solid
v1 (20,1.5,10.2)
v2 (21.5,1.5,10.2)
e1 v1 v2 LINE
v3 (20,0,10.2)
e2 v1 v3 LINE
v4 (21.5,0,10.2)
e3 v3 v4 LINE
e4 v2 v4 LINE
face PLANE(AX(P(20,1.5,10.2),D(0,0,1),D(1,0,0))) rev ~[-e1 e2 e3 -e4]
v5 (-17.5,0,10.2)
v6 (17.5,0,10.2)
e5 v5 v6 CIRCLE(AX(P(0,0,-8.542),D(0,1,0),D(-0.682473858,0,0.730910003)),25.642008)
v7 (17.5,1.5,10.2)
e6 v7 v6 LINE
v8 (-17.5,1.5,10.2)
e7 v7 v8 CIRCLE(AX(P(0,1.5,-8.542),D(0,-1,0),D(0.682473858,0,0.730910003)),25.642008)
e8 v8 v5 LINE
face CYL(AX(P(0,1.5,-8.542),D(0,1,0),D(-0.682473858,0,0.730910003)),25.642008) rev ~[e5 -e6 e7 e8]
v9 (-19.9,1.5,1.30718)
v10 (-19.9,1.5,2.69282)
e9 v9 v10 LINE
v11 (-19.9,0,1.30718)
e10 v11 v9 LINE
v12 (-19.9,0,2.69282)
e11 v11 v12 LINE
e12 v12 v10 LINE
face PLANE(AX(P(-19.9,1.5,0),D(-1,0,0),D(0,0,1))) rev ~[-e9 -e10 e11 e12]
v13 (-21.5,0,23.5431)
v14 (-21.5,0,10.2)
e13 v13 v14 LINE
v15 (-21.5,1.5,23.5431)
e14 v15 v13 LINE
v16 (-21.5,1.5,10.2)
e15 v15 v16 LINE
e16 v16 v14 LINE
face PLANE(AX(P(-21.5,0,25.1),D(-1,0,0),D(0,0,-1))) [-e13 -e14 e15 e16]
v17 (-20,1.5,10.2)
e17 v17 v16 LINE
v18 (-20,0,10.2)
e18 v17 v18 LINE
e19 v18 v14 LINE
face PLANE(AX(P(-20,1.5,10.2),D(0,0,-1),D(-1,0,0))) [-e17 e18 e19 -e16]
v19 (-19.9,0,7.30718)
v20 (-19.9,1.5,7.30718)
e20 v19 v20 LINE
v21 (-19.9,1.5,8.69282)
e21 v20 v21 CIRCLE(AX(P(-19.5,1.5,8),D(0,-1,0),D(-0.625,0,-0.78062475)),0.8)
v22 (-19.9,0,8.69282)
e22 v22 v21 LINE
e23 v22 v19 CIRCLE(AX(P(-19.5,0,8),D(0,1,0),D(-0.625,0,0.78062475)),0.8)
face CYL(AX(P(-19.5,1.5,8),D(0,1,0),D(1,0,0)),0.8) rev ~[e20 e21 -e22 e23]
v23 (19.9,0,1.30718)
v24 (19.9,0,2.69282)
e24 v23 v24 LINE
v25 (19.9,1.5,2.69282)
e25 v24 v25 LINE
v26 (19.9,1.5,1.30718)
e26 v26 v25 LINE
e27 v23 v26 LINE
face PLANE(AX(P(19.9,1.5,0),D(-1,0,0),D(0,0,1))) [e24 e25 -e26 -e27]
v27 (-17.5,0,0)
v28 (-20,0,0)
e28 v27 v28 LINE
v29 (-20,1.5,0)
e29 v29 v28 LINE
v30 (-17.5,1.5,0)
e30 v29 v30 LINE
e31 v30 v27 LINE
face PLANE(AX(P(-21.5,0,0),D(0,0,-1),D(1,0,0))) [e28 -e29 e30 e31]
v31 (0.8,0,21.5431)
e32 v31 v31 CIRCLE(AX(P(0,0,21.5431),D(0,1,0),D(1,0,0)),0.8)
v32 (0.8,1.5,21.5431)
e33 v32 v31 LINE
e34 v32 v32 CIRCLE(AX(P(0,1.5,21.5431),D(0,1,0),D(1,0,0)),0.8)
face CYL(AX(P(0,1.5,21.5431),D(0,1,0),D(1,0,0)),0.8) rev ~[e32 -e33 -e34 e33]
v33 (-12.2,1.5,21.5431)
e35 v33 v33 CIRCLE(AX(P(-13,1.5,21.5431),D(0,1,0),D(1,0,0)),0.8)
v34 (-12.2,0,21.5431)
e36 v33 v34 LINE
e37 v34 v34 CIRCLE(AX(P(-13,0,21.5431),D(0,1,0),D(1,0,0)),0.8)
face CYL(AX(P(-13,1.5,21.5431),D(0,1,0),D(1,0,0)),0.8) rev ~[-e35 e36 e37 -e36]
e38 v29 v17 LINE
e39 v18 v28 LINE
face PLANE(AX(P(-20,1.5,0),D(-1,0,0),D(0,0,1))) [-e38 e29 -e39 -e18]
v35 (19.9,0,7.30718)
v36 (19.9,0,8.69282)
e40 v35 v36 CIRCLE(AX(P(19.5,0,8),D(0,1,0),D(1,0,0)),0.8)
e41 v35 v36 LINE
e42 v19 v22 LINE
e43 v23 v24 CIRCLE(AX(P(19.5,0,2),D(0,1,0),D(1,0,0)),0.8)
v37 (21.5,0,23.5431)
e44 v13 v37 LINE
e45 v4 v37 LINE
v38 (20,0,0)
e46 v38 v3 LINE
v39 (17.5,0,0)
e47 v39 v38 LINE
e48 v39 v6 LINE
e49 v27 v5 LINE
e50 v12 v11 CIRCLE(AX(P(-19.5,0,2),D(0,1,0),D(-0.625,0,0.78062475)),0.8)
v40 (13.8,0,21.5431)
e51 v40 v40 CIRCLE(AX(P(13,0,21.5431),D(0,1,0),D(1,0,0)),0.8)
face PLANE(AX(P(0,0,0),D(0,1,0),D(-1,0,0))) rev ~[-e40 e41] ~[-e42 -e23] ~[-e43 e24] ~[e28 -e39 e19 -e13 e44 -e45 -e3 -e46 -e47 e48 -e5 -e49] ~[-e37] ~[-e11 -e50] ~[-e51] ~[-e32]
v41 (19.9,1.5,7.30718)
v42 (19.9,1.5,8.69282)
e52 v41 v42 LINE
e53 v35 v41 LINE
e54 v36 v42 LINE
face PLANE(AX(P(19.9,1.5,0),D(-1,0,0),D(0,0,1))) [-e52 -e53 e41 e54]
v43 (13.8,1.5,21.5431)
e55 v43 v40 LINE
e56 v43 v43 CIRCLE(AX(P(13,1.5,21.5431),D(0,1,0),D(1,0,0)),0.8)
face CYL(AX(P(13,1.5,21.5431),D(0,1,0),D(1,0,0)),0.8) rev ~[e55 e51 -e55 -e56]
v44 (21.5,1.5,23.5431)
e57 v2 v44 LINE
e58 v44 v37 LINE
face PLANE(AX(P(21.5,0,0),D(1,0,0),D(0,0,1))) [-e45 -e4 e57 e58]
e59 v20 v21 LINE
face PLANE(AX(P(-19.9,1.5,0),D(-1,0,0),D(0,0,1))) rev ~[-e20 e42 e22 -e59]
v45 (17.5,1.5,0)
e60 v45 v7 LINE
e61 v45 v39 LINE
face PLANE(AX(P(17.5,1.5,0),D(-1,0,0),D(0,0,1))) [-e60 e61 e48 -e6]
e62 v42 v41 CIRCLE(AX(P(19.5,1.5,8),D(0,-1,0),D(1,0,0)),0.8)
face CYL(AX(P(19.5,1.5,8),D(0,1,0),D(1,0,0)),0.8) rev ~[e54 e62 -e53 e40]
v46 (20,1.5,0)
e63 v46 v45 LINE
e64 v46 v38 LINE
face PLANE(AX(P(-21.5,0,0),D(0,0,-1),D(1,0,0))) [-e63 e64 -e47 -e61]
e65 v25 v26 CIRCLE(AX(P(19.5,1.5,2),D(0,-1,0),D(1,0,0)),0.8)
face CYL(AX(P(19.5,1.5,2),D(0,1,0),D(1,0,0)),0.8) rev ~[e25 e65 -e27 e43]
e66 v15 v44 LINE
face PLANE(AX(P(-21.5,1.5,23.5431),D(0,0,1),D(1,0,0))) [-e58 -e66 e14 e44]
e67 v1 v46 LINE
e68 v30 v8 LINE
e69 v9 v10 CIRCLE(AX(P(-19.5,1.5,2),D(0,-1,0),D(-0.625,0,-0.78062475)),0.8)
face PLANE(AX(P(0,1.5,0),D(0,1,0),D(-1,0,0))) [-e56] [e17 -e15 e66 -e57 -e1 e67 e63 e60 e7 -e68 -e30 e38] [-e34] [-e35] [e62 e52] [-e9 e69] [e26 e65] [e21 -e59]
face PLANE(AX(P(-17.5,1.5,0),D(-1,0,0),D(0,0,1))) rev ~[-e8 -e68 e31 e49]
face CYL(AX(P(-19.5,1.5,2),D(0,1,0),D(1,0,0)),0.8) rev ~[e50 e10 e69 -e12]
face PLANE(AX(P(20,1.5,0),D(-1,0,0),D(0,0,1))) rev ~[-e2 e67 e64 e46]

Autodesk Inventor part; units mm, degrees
ref_plane "YZ Plane" through (0, 0, 0) normal (1, 0, 0) x (0, 1, 0)
ref_plane "XZ Plane" through (0, 0, 0) normal (0, 1, 0) x (-1, 0, 0)
ref_plane "XY Plane" through (0, 0, 0) normal (0, 0, 1) x (1, 0, 0)
sketch "スケッチ7" plane through (0, 1.5, 0) normal (0, 1, 0) x (1, 0, 0)
  line L0 (-20, 0) -> (-19.9, 0)
  line L1 (-19.9, 0) -> (-19.9, -10.2)
  line L2 (-19.9, -10.2) -> (-20, -10.2)
  line L3 (-20, -10.2) -> (-20, 0)
  line L4 (17.5, 0) -> (20, 0)
  line L5 (20, 0) -> (19.9, 0)
  line L6 (19.9, 0) -> (19.9, -10.2)
  line L7 (19.9, -10.2) -> (20, -10.2)
  line L8 (20, -10.2) -> (20, 0)
  line L9 (-20, -10.2) -> (-21.5, -10.2)
  line L10 (-20, 0) -> (-20, -1.3755)
  point P0 (0, 0)
  dimension "d21" = 0.1
  dimension "d22" = 0.1
sketch "スケッチ1" plane through (0, 0, 0) normal (0, 1, 0) x (-1, 0, 0)
  line L0 (21.5, 0) -> (-21.5, 0)
  line L1 (-21.5, 0) -> (-21.5, 25.1)
  line L2 (-21.5, 25.1) -> (21.5, 25.1)
  line L3 (21.5, 25.1) -> (21.5, 0)
  point P0 (0, 0)
  point P1 (0, 0)
  dimension "d0" = 25.1
  dimension "d1" = 43
extrude "プレート1" add sketch "スケッチ1" along normal blind 1.5
sketch "スケッチ3" plane through (0, 1.5, 0) normal (0, 1, 0) x (1, 0, 0)
  line L0 (21.5, 0) -> (-21.5, 0) projected
  line L1 (-20, 0) -> (-20, -17.1)
  line L2 (20, 0) -> (20, -17.1)
  line L3 (-21.5, -25.1) -> (-21.5, 0) projected
  line L4 (21.5, 0) -> (21.5, -25.1) projected
  line L5 (-20, -17.1) -> (20, -17.1)
  line L6 (-20, 0) -> (-17.5, 0)
  line L7 (-17.5, 0) -> (-17.5, -10.2)
  line L8 (-17.5, -10.2) -> (-20, -10.2)
  line L9 (-20, -10.2) -> (-20, 0)
  line L10 (20, 0) -> (17.5, 0)
  line L11 (17.5, 0) -> (17.5, -10.2)
  line L12 (17.5, -10.2) -> (20, -10.2)
  line L13 (20, -10.2) -> (20, 0)
  line L14 (-20, -10.2) -> (-21.5, -10.2)
  line L15 (20, -10.2) -> (21.5, -10.2)
  line L16 (21.5, -25.1) -> (-21.5, -25.1) projected
  arc A0 (-17.5, -10.2) -> (17.5, -10.2) centre (0, 8.542) ccw
  point P0 (0, 0)
  point P1 (20, -10.2)
  point P2 (17.5, 0)
  point P3 (-17.5, 0)
  dimension "d5" = 1.5
  dimension "d6" = 1.5
  dimension "d7" = 2.5
  dimension "d8" = 10.2
  dimension "d9" = 8
extrude "押し出し2" cut sketch "スケッチ3" against normal through all contours L4 L15 L2 L0 | L11 A0 L7 L0 | L1 L14 L3 L0
sketch "スケッチ4" plane through (-21.5, 0, 25.1) normal (-1, 0, 0) x (0, 0, 1)
  line L0 (-0.5569, 2.6) -> (-0.5569, 0)
  line L1 (0, 0) -> (-14.9, 0) projected
  line L2 (-14.9, 1.5) -> (-14.9, 0) projected
  line L3 (-14.9, 0) -> (0, 0) projected
  line L4 (0, 0) -> (0, 1.5) projected
  line L5 (0, 1.5) -> (-14.9, 1.5) projected
  point P0 (-25.1, 0)
  point P1 (0, 0)
  point P2 (-0.5569, 1.5)
extrude "押し出し3" cut sketch "スケッチ4" against normal through all contours L5 L4 L1 L0
sketch "スケッチ5" plane through (0, 1.5, 0) normal (0, 1, 0) x (1, 0, 0)
  circle A0 centre (0, -21.5431) radius 0.8 projected
  circle A1 centre (-13, -21.5431) radius 0.8 projected
  circle A2 centre (13, -21.5431) radius 0.8 projected
  line L0 (-21.5, -24.5431) -> (-21.5, -10.2) projected
  line L1 (-21.5, -23.5431) -> (21.5, -23.5431)
  line L2 (21.5, -24.5431) -> (-21.5, -24.5431) projected
  line L3 (21.5, -10.2) -> (21.5, -24.5431) projected
  point P0 (0, 0)
  dimension "d16" = 1
extrude "切り取り1" cut sketch "スケッチ5" against normal blind 1.5
sketch "スケッチ6" plane through (0, 1.5, 0) normal (0, 1, 0) x (1, 0, 0)
  circle A0 centre (19.5, -2) radius 0.8 projected
  circle A1 centre (19.5, -8) radius 0.8 projected
  line L0 (0, -21.3988) -> (0, 0)
  circle A2 centre (-19.5, -2) radius 0.8
  circle A3 centre (-19.5, -8) radius 0.8
  line L1 (-20, 0) -> (-17.5, 0) projected
  line L2 (-20, 0) -> (-19.9, 0)
  line L3 (-19.9, 0) -> (-19.9, -10.2)
  line L4 (-19.9, -10.2) -> (-20, -10.2)
  line L5 (-20, -10.2) -> (-20, 0)
  line L6 (-20, -10.2) -> (-21.5, -10.2) projected
  line L7 (20, 0) -> (19.9, 0)
  line L8 (19.9, 0) -> (19.9, -10.2)
  line L9 (19.9, -10.2) -> (20, -10.2)
  line L10 (20, -10.2) -> (20, 0)
  line L11 (17.5, 0) -> (20, 0) projected
  line L12 (21.5, -10.2) -> (20, -10.2) projected
  line L13 (20, -10.2) -> (20, 0) projected
  dimension "d19" = 0.1
  dimension "d20" = 0.1
extrude "切り取り2" cut sketch "スケッチ6" against normal blind 1.5 contours A0 L10 | L10 A0 L8 | L8 A0 | L10 A1 L8 | A1 L10 | L8 A1 | A2 L3 | L3 A2 L5 | L5 A2 | L3 A3 L5 | A3 L3 | L5 A3
sheet face with bend "面2" sketch "スケッチ7" thickness 1.5 toward (0, -1, 0) bend radius 1.5
bend "曲げ1"
equation "\"d6\" = d5"
equation "\"d14\" = Thickness"
equation "\"d17\" = Thickness"
equation "\"d2\" = Thickness"
equation "\"d23\" = BendRadius"
equation "\"d24\" = BendReliefWidth"
equation "\"d26\" = MinimumRemnant"
equation "\"d25\" = BendReliefDepth"
equation "\"d27\" = TransitionRadius"
equation "\"BendRadius\" = Thickness"
equation "\"BendReliefWidth\" = Thickness"
equation "\"BendReliefDepth\" = 0.5 * Thickness"
equation "\"CornerReliefSize\" = 4 * Thickness"
equation "\"MinimumRemnant\" = 2 * Thickness"
equation "\"TransitionRadius\" = BendRadius"
equation "\"JacobiRadiusSize\" = BendRadius"
equation "\"GapSize\" = Thickness"
equation "\"Thickness\" = 1.5"
properties part number "chest_cover_base" material "アルミニウム 6061"
